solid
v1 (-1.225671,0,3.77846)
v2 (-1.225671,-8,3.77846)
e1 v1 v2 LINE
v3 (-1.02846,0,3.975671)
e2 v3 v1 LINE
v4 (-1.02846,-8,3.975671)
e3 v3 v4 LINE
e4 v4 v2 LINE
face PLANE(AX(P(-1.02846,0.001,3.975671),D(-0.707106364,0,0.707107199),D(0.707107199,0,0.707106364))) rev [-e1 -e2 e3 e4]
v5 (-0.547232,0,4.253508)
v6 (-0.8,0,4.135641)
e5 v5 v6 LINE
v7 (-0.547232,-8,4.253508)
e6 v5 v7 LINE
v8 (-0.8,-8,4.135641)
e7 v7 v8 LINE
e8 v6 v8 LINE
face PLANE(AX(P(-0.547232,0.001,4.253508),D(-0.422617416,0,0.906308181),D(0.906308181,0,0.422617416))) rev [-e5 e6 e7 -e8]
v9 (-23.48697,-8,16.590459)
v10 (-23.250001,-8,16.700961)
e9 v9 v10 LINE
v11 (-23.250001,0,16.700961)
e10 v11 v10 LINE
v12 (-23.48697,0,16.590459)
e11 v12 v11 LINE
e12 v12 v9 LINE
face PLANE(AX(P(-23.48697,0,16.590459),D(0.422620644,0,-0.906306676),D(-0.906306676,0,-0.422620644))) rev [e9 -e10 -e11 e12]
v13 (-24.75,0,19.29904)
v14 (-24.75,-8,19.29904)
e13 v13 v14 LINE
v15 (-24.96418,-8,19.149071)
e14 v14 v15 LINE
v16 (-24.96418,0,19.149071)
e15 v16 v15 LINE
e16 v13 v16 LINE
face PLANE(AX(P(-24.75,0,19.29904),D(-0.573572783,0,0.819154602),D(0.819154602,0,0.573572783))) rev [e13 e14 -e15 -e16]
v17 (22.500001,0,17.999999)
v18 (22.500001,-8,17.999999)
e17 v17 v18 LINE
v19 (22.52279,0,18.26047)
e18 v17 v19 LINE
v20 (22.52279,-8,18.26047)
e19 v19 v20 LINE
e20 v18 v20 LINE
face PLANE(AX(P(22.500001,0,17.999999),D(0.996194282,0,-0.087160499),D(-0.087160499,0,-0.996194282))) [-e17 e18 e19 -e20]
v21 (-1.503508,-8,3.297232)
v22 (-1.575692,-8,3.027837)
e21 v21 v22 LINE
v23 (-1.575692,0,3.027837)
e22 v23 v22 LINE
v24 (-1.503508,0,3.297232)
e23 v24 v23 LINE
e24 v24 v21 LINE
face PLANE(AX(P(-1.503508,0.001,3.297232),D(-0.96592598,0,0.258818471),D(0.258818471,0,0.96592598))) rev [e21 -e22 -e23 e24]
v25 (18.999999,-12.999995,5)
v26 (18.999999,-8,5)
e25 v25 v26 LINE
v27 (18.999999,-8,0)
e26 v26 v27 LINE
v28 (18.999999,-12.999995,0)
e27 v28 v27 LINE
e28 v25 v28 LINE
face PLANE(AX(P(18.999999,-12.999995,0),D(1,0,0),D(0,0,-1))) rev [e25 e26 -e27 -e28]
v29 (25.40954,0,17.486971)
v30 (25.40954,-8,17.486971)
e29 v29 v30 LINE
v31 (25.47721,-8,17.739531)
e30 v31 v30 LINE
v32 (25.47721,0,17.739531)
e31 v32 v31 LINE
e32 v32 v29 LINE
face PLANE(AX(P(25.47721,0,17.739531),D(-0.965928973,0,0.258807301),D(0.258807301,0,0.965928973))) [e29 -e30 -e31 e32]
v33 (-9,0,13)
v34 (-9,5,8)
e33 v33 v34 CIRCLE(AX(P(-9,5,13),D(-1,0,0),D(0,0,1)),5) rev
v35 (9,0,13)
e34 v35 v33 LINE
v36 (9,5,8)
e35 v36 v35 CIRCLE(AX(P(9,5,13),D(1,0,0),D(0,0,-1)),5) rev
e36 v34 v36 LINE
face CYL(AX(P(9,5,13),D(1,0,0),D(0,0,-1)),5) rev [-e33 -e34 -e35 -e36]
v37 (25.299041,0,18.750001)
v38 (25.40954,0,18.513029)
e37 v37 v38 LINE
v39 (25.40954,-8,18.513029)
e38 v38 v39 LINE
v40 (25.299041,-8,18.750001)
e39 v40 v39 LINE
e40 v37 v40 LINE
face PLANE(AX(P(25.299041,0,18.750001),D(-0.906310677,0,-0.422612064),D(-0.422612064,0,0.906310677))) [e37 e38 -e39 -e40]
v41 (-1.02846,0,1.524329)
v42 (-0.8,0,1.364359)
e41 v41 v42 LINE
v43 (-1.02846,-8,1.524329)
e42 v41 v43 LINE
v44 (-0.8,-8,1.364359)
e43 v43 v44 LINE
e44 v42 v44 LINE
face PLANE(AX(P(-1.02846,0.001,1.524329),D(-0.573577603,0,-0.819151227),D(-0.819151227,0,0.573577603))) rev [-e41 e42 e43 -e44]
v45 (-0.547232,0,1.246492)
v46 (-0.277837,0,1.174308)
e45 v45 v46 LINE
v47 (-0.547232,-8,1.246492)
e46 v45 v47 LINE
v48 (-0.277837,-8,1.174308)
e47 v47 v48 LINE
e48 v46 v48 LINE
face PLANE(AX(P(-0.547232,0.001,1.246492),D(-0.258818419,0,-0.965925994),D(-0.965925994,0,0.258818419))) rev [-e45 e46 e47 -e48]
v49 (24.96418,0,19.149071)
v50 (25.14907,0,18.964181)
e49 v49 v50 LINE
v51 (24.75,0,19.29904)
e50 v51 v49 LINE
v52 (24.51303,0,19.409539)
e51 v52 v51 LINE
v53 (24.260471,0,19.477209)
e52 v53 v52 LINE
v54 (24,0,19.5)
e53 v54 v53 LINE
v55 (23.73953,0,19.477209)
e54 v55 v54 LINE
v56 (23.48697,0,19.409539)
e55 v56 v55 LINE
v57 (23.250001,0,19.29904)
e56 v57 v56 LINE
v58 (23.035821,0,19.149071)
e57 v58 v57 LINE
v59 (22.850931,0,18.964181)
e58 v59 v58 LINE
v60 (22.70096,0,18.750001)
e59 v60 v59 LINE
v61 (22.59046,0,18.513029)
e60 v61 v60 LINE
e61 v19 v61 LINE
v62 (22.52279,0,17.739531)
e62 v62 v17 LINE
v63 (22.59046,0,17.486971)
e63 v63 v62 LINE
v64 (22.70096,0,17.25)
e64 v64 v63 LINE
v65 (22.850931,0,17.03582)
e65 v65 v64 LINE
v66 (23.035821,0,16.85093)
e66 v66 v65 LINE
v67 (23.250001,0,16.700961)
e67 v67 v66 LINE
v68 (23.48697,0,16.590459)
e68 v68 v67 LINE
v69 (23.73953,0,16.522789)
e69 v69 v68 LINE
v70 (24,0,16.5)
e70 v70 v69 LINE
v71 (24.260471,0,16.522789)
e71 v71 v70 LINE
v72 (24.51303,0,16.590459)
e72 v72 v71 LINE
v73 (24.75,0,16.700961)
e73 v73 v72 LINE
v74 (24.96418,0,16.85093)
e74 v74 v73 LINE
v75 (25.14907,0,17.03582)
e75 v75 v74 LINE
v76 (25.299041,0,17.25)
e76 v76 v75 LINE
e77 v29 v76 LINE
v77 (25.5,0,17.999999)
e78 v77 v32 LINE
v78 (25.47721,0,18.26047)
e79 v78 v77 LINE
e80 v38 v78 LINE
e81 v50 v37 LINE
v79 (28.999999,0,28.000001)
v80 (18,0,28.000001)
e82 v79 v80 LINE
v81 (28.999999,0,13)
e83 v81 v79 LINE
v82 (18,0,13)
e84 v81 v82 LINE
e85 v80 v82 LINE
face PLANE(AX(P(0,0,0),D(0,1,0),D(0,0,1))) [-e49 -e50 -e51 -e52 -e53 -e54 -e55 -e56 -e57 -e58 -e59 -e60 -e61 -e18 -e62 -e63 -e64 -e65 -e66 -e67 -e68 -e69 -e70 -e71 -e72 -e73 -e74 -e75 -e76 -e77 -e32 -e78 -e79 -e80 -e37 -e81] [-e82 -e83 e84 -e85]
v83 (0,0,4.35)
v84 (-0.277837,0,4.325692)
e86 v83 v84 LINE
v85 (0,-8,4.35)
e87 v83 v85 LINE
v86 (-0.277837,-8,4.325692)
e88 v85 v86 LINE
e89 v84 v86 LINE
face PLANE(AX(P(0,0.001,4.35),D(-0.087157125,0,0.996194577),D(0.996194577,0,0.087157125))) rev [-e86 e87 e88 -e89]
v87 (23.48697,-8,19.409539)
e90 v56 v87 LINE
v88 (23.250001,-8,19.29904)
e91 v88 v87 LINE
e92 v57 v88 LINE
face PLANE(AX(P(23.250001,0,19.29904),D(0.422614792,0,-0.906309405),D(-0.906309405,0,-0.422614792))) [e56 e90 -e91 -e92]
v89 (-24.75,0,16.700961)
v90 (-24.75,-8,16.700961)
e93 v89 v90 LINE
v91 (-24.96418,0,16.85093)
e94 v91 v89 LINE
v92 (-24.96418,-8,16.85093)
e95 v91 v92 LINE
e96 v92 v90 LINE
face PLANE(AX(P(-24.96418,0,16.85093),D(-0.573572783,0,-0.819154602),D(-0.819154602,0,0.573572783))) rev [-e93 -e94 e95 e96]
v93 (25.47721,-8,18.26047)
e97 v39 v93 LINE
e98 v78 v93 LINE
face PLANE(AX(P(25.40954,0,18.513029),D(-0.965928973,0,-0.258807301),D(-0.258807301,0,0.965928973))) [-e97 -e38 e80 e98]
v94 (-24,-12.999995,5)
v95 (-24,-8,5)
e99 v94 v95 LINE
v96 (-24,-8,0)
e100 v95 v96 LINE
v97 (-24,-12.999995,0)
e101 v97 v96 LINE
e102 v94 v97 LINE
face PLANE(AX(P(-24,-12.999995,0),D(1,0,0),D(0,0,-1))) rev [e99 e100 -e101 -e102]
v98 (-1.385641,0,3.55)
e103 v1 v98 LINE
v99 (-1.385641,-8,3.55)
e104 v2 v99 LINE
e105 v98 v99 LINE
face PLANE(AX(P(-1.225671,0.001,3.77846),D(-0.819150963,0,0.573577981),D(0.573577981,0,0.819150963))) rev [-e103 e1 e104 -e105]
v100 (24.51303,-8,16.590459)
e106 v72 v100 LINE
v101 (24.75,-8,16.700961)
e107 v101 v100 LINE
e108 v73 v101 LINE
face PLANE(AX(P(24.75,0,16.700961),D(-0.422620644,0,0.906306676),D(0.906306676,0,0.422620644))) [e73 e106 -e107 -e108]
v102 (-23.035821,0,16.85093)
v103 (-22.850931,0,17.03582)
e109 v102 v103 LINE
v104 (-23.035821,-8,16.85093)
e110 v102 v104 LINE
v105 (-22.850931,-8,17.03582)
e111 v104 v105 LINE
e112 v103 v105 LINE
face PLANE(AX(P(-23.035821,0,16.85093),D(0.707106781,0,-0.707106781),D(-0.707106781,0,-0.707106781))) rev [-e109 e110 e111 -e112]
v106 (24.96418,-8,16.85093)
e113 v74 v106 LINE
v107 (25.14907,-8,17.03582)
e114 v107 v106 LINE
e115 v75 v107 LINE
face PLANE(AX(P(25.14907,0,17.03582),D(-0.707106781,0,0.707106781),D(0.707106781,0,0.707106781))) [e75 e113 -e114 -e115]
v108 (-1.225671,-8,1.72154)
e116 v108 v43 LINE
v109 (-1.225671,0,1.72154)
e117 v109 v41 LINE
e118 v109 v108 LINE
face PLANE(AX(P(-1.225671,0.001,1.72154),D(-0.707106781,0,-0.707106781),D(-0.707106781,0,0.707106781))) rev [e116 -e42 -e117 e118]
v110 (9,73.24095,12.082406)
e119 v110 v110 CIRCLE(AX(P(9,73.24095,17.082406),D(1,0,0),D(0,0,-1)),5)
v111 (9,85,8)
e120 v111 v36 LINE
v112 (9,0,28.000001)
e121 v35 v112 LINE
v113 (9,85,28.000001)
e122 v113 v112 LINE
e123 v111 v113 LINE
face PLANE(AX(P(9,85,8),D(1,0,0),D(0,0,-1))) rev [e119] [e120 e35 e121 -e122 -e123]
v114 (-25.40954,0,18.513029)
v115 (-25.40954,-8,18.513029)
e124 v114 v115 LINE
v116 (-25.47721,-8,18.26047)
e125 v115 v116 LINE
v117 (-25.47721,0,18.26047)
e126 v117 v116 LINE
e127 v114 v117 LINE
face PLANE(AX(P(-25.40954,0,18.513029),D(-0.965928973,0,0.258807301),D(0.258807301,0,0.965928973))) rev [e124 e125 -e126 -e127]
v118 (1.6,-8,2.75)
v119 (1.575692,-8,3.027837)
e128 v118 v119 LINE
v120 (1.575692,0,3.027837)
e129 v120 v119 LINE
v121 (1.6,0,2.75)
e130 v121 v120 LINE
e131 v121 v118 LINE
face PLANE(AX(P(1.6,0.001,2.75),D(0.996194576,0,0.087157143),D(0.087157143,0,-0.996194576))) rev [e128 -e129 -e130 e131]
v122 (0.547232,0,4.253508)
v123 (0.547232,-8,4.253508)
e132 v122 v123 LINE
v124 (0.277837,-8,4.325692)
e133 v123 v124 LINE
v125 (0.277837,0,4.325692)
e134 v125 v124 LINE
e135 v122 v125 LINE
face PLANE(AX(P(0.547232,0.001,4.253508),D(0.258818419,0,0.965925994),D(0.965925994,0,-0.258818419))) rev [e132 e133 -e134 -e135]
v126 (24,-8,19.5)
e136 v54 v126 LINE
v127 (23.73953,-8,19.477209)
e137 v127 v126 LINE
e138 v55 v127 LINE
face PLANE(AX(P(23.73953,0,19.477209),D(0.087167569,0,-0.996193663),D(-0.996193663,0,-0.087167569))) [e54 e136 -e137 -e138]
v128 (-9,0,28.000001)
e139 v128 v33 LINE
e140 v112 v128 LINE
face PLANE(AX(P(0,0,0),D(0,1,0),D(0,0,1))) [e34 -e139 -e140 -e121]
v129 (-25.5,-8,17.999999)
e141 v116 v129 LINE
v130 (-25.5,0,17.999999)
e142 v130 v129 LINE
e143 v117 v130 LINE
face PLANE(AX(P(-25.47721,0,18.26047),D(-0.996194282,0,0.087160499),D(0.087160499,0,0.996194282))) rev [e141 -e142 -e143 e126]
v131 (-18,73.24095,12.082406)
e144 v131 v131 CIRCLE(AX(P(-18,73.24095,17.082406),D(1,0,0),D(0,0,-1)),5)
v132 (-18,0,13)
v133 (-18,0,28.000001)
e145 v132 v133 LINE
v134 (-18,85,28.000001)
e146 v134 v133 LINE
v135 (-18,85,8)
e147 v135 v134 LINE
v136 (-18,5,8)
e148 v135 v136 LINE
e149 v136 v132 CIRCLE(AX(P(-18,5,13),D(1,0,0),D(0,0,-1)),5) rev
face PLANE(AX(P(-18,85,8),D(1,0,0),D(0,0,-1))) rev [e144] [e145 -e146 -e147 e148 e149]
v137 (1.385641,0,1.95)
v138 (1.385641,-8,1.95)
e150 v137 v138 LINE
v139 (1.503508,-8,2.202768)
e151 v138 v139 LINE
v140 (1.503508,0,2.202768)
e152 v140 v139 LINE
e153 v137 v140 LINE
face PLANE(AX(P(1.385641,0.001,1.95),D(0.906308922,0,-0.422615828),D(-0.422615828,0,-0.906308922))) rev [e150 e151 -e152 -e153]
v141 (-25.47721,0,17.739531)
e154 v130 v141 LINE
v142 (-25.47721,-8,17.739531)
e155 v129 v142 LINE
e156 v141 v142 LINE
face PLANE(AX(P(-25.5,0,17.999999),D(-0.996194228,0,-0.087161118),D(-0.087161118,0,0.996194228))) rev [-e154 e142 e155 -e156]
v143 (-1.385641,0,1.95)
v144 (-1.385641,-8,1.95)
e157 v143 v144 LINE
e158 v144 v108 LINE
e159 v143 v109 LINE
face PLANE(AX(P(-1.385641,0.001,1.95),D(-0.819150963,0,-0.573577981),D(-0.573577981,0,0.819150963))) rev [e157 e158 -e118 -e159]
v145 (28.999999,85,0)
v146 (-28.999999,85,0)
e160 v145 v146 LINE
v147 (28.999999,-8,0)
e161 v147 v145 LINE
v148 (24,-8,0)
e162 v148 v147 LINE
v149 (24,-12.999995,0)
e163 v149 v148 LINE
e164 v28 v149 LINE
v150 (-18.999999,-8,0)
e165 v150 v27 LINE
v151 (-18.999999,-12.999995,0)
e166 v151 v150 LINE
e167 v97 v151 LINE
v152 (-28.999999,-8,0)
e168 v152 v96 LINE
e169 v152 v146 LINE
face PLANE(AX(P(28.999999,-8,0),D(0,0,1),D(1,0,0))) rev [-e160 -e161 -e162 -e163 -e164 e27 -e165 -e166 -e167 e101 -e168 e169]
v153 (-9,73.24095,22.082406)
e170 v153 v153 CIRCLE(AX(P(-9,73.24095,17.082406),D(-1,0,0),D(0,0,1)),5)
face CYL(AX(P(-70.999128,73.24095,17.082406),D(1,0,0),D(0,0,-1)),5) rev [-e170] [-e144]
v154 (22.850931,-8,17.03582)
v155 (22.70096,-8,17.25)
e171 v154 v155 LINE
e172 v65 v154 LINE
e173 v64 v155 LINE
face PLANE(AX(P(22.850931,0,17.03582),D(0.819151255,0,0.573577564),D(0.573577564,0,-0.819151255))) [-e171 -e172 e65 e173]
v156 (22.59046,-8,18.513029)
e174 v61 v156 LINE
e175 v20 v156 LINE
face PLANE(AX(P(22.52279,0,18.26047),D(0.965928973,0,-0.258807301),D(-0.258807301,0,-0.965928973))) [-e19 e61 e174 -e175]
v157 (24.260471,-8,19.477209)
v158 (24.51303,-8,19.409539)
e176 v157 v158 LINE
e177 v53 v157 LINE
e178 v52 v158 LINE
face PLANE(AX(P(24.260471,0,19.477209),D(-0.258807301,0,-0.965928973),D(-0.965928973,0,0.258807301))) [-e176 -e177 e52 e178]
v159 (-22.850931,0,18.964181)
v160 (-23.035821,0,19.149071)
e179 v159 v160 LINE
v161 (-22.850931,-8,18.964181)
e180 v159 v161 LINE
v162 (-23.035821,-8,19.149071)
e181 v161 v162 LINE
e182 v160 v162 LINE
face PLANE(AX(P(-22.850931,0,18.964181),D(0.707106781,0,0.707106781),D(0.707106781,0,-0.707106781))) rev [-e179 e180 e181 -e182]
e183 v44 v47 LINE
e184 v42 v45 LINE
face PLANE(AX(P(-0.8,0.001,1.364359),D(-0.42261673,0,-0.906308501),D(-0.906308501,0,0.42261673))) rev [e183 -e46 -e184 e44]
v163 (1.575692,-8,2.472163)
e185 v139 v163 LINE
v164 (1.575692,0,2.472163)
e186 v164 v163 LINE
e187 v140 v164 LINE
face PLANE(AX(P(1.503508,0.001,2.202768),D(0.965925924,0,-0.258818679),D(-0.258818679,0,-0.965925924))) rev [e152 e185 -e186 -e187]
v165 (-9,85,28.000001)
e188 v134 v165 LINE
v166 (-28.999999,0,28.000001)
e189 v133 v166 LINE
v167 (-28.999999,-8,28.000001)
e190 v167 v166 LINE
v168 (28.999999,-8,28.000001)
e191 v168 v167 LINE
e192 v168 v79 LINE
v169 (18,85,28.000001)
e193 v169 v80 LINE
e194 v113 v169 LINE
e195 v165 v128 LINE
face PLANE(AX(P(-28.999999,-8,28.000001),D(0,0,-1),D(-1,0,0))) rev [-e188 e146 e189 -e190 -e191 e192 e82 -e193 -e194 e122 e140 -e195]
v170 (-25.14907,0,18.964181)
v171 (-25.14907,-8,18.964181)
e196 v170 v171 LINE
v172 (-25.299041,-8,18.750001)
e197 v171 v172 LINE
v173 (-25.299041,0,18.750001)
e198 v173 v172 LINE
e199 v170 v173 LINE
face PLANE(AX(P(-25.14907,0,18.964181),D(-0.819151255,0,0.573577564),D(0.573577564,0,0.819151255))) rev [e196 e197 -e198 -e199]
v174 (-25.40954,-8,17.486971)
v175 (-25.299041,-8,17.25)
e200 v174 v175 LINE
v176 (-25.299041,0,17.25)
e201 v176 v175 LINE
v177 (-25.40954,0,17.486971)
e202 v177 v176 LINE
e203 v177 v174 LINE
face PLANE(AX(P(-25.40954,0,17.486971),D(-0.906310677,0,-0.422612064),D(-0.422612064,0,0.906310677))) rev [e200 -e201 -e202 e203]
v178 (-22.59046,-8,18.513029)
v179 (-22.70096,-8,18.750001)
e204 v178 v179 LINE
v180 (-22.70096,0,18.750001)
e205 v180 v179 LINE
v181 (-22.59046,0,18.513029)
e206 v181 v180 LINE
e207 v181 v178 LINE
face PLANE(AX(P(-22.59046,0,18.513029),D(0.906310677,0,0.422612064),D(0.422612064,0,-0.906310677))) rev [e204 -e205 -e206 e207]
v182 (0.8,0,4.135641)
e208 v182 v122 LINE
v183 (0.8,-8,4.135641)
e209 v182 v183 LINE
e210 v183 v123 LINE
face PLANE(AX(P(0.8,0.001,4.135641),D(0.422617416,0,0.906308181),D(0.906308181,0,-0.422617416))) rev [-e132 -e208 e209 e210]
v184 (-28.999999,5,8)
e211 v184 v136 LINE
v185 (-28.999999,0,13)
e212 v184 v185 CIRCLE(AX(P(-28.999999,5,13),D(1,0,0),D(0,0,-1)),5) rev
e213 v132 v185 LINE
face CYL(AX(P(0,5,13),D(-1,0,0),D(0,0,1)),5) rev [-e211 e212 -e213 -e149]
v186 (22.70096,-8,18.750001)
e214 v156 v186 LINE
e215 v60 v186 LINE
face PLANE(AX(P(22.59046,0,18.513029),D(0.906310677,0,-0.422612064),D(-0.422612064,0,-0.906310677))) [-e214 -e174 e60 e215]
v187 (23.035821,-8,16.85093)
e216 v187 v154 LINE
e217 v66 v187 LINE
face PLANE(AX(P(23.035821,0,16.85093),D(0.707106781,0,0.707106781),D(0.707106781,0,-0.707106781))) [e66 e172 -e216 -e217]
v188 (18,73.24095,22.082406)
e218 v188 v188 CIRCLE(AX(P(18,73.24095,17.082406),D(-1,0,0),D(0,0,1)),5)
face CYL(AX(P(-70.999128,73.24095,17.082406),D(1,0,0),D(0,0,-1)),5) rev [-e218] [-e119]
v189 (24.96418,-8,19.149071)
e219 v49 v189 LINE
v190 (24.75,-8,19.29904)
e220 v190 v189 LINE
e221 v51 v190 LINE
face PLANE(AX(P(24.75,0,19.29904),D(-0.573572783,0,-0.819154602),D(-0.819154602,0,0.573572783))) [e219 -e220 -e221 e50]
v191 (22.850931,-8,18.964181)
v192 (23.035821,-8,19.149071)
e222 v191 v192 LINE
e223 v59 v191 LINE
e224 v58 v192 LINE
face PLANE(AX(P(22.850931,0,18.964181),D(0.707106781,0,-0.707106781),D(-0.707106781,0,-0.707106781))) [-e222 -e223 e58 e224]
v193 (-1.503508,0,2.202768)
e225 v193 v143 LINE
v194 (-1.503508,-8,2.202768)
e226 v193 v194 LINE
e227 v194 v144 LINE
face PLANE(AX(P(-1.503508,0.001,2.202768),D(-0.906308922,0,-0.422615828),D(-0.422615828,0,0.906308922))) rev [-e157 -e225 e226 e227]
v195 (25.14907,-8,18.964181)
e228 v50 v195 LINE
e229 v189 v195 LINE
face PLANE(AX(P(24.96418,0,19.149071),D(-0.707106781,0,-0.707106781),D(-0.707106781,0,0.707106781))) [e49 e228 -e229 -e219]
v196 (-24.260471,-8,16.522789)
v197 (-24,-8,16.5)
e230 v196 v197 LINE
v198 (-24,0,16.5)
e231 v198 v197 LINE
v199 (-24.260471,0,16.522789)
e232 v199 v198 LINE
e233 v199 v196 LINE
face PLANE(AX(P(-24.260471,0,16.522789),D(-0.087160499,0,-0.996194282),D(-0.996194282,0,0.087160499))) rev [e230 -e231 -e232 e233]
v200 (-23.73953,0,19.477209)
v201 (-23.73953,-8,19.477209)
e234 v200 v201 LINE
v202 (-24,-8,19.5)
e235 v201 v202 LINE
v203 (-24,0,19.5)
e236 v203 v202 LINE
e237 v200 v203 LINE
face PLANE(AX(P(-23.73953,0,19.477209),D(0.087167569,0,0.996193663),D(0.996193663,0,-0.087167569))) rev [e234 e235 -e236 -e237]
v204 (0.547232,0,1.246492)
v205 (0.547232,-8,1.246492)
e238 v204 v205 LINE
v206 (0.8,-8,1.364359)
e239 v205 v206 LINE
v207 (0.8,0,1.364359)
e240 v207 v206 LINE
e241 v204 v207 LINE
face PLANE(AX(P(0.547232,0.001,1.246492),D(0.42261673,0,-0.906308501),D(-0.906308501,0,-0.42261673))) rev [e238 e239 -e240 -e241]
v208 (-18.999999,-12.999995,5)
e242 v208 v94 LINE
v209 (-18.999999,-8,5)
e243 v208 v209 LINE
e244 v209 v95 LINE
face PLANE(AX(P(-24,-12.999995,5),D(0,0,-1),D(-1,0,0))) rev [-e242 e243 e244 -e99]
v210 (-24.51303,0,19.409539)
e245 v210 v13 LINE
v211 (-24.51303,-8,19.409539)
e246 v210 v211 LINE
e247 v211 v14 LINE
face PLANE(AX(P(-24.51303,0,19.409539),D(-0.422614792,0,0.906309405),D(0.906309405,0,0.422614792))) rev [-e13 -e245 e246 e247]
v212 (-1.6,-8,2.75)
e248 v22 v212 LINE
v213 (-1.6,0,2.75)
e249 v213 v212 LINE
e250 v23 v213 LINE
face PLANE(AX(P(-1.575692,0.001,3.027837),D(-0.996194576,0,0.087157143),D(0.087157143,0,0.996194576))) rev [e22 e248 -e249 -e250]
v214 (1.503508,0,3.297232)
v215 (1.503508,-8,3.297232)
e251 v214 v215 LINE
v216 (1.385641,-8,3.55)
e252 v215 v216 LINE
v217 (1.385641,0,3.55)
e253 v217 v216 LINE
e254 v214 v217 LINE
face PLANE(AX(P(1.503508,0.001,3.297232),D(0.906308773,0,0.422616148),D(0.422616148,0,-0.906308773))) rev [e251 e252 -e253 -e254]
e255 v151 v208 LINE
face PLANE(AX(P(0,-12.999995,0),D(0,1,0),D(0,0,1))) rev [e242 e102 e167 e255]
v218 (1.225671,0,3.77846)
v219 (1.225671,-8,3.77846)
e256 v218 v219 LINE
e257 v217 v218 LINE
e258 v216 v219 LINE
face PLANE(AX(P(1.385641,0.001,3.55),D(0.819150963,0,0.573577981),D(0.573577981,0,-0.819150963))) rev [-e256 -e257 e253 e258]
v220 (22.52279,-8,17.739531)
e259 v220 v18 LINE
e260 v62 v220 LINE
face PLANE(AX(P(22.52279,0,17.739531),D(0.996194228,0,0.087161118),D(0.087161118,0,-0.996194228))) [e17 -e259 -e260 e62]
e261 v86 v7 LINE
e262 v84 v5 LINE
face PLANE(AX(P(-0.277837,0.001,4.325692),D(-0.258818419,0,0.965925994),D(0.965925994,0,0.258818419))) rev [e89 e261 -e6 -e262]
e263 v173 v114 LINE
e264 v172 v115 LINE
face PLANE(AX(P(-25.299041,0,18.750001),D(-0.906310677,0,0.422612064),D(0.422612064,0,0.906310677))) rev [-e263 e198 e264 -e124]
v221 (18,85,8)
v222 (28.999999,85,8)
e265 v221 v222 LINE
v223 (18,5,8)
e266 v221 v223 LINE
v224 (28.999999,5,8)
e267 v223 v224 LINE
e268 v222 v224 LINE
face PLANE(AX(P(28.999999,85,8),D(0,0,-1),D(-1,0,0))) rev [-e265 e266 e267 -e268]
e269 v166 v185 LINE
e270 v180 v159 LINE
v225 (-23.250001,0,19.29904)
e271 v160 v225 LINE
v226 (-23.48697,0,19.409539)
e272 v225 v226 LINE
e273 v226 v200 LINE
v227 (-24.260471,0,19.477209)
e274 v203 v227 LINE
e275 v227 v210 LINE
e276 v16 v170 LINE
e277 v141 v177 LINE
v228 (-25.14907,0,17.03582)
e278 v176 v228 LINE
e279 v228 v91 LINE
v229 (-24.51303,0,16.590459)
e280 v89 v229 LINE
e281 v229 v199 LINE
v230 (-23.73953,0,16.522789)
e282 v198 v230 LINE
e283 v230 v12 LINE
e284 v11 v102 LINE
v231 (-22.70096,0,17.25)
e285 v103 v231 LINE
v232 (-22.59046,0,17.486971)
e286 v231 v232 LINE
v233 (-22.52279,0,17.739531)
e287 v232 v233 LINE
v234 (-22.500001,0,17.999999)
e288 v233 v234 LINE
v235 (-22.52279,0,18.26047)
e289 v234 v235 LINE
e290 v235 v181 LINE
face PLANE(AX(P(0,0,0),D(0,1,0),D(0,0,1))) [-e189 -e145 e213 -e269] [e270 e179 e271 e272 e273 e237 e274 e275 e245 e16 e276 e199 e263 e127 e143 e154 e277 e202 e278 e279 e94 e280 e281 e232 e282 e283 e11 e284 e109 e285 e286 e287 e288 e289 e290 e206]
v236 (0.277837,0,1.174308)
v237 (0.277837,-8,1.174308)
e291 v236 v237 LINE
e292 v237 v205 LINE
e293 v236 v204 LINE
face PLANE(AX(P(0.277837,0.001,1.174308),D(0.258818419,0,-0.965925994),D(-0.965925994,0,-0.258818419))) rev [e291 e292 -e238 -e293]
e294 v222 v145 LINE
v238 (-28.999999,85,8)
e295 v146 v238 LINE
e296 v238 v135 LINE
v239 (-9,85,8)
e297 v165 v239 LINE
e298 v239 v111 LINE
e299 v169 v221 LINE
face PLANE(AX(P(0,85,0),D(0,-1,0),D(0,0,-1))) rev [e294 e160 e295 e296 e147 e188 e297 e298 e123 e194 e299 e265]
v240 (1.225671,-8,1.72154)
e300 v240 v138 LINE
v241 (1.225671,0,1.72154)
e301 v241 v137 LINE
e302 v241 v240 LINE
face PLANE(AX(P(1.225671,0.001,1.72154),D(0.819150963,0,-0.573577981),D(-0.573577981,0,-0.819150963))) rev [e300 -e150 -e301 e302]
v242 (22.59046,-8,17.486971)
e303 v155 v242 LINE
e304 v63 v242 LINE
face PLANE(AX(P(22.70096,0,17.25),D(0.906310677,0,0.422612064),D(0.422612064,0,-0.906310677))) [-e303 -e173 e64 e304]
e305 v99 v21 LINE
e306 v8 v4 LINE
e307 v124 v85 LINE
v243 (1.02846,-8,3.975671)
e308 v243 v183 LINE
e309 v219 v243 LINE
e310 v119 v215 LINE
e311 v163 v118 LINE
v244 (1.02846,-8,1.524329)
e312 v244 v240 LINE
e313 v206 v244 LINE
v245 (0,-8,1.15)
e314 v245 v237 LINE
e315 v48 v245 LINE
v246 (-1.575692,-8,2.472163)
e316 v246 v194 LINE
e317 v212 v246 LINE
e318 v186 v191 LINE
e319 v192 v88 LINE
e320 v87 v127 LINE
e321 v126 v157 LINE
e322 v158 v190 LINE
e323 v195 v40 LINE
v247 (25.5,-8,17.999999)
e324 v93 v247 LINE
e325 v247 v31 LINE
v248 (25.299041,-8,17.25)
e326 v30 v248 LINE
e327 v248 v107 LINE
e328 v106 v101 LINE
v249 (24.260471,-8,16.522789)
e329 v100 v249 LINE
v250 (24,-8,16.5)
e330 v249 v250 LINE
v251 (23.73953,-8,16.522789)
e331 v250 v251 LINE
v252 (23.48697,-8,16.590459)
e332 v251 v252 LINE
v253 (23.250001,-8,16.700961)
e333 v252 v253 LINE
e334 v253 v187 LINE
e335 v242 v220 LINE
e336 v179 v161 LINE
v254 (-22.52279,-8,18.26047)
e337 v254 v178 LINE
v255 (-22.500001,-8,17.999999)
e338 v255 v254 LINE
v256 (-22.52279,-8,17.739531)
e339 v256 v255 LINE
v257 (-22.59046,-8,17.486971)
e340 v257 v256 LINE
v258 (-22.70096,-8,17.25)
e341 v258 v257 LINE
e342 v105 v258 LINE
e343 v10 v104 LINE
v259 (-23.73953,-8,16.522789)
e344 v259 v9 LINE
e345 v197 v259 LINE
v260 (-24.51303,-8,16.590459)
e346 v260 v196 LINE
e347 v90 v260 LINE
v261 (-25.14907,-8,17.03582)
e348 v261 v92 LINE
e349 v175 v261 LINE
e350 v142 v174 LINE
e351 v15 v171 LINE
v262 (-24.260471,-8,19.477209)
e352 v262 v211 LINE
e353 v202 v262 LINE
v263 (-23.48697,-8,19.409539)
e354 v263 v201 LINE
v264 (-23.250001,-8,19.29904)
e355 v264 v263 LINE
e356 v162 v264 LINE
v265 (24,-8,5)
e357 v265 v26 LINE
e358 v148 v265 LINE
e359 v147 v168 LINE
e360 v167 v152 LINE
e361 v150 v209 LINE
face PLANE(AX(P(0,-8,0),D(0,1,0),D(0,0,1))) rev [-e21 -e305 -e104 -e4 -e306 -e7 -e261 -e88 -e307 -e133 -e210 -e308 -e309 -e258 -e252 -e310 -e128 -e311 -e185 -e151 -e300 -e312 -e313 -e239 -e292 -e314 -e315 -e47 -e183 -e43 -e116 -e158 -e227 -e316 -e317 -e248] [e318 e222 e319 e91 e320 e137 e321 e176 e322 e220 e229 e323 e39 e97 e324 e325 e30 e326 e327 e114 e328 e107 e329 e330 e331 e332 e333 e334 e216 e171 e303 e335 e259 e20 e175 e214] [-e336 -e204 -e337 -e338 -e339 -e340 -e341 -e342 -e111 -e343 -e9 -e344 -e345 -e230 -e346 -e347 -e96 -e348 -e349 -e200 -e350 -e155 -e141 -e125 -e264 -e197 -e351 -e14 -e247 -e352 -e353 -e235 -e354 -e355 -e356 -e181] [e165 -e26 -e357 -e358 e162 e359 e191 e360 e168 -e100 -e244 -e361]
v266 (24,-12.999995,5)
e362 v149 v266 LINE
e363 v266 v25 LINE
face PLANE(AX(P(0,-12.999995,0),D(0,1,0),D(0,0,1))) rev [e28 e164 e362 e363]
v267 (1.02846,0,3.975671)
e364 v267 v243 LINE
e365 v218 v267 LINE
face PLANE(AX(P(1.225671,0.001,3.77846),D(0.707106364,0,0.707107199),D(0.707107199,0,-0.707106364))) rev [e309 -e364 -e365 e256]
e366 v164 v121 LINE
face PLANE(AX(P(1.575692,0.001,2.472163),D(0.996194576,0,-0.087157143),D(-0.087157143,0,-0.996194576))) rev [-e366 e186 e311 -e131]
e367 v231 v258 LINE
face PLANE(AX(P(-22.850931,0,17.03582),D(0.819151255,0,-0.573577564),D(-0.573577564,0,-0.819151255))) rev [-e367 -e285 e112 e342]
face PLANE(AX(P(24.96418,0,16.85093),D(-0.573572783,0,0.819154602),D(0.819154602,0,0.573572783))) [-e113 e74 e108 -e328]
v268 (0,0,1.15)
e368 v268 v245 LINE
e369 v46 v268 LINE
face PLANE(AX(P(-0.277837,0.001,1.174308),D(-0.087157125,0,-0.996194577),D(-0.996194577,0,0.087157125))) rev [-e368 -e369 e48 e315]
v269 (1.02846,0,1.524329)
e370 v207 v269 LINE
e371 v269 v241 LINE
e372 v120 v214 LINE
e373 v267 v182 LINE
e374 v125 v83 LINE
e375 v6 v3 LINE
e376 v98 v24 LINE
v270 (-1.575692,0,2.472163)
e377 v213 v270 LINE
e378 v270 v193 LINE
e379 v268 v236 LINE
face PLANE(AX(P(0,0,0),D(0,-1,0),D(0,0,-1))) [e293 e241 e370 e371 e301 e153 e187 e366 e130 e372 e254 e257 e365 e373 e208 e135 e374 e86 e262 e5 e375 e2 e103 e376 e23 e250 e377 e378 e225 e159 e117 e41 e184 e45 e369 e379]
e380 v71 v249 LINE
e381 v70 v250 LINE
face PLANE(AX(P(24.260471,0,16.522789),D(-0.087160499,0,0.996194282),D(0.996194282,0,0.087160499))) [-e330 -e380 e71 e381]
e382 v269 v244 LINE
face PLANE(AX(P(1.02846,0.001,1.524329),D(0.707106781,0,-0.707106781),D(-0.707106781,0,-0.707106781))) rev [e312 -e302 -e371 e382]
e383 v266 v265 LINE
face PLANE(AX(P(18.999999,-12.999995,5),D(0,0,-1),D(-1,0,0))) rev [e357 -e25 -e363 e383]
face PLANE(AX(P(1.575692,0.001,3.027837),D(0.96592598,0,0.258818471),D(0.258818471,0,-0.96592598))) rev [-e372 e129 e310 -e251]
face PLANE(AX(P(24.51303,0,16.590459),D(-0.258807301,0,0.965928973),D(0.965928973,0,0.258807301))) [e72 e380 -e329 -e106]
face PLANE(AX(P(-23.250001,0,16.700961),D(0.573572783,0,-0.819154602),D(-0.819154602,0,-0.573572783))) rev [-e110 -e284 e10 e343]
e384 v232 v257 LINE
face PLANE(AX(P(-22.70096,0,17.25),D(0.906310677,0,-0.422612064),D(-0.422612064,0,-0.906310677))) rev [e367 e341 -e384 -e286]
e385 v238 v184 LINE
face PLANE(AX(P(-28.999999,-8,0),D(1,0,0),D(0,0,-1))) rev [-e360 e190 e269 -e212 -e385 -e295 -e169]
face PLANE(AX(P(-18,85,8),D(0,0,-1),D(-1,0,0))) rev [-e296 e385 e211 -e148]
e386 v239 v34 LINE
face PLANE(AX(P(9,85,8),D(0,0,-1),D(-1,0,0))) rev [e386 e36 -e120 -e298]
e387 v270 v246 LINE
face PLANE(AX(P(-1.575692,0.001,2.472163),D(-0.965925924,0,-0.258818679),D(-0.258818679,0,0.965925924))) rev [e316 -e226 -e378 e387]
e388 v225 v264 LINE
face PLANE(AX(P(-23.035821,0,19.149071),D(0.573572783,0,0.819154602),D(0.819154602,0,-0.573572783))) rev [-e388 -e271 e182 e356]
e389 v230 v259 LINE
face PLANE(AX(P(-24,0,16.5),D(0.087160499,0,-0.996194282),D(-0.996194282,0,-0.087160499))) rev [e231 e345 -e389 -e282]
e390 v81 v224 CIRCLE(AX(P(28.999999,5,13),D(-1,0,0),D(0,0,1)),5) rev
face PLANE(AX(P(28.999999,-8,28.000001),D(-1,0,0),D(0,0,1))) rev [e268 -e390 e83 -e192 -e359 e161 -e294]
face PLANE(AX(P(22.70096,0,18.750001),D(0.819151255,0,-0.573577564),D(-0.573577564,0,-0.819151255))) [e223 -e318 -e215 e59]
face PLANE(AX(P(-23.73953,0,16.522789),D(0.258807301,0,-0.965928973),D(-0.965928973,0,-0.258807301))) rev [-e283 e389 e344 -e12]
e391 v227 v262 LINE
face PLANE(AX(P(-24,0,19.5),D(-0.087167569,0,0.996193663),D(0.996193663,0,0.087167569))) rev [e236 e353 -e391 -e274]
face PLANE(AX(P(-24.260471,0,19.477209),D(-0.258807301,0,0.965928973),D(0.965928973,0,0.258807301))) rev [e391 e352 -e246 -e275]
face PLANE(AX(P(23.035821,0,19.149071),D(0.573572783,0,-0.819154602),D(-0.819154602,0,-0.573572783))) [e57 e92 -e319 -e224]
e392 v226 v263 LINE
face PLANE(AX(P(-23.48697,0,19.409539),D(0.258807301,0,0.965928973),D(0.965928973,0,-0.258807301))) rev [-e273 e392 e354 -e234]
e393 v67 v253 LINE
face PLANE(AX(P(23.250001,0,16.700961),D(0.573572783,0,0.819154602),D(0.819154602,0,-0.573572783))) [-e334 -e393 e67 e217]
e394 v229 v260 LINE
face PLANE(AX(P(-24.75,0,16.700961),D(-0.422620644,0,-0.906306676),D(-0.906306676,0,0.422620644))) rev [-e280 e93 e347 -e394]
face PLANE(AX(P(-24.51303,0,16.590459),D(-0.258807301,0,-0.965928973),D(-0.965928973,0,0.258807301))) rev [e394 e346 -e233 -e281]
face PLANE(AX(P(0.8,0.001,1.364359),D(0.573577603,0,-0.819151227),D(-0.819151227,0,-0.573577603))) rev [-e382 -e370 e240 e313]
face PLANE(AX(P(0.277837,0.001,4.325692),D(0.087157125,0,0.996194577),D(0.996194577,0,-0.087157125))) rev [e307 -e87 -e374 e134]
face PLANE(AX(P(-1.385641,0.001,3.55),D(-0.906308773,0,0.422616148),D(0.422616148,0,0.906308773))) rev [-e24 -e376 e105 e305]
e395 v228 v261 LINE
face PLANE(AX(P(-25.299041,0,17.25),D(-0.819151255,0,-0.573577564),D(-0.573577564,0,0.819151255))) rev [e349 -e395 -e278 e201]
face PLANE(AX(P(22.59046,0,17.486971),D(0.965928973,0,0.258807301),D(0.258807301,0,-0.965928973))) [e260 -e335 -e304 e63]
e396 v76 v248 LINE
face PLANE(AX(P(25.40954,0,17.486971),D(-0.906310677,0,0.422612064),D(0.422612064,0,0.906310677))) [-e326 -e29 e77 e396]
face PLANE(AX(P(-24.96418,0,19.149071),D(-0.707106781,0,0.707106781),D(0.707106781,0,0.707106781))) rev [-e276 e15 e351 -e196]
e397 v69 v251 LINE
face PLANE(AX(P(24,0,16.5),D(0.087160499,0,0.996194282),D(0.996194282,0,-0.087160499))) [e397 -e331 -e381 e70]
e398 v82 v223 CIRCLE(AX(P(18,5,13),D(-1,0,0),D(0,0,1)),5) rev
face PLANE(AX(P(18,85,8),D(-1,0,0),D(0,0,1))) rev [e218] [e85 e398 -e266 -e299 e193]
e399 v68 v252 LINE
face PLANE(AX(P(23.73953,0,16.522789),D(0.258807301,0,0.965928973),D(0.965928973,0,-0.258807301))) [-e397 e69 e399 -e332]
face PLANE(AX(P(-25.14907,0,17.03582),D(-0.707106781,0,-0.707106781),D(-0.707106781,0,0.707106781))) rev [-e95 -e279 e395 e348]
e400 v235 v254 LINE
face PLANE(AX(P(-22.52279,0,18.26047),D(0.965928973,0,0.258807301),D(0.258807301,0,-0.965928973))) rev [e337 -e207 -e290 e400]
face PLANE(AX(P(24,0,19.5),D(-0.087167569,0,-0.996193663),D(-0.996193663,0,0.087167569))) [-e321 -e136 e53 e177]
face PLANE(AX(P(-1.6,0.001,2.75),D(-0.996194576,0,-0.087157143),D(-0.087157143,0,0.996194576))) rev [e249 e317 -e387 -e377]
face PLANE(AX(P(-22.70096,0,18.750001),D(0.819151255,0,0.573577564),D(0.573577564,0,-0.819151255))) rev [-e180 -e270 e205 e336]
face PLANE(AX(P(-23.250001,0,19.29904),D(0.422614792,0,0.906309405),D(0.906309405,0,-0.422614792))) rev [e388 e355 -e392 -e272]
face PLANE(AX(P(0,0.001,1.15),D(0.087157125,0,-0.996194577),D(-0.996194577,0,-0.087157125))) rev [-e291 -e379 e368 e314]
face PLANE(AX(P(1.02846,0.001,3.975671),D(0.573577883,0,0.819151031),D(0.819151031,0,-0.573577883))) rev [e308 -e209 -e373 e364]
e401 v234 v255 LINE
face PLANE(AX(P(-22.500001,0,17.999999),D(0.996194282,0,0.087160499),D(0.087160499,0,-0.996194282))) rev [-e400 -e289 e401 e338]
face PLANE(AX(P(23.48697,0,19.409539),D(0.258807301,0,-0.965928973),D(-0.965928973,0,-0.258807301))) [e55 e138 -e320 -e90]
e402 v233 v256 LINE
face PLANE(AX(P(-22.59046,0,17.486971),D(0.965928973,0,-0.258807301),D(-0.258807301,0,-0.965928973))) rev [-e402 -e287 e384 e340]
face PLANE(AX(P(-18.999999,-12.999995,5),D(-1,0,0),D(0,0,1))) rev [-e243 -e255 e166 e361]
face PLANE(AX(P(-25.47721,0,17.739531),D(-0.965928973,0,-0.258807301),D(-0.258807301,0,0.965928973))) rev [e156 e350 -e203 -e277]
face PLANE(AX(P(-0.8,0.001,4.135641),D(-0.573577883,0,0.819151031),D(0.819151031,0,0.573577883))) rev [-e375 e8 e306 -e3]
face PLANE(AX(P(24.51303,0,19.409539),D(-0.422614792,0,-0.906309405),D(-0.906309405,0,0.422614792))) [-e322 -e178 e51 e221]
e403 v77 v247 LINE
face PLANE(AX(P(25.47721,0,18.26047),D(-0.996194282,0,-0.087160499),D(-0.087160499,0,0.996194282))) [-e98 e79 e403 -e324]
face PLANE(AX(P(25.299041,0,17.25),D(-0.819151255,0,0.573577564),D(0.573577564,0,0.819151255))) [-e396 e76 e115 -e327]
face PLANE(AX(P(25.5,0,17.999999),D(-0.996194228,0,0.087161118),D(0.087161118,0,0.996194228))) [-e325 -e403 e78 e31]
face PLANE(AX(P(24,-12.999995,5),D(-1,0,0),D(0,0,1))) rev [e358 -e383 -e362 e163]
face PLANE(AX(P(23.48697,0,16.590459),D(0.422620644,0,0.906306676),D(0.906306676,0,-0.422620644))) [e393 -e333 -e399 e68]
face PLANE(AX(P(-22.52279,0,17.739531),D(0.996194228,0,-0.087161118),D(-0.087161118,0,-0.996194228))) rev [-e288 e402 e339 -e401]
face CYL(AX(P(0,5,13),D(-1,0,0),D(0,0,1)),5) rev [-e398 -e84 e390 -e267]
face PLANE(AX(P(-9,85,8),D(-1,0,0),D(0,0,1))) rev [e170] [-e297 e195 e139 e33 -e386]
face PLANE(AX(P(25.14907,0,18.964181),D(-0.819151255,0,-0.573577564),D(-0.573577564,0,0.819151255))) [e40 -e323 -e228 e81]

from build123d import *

# Parameters (mm, degrees)
SKETCH1_W           = 57.999998332
SKETCH1_H           = 28.000000864
BOSS_EXTRUDE1_DEPTH = 8
CUT_EXTRUDE2_REACH  = 43.097
CUT_EXTRUDE3_DEPTH  = 42.097445176
CUT_EXTRUDE4_DEPTH  = 42.097445176
SKETCH8_W           = 5.00000082
SKETCH8_H           = 4.999999888
BOSS_EXTRUDE2_DEPTH = 4.999995232
SKETCH9_W           = 5.00000082
SKETCH9_H           = 4.999999888
BOSS_EXTRUDE3_DEPTH = 4.999995232
BOSS_EXTRUDE4_DEPTH = 85
FILLET1_R           = 5
FILLET2_R           = 5
FILLET3_R           = 5
HOLE1_START         = -18
HOLE1_OUTLINE_R     = 5
HOLE1_DEPTH         = 36


# Read off the part's stored shape, not the designer's step: Hole1
with BuildPart() as part:
    # Sketch1 → Boss-Extrude1 (new body)
    with BuildSketch(Plane.XZ):
        with Locations((0, 14.000000432)):
            Rectangle(SKETCH1_W, SKETCH1_H)
    extrude(amount=BOSS_EXTRUDE1_DEPTH)

    # Sketch3 → Cut-Extrude2 (cut, up to next)
    with BuildSketch(Plane.XZ.offset(8), mode=Mode.PRIVATE) as cut_extrude2_sk1:
        Polygon((0, 4.350000061), (-0.277837098, 4.325692076), (-0.547232223, 4.253508057), (-0.79999998, 4.135640804), (-1.028459985, 3.975670785), (-1.225671032, 3.77845997), (-1.385641051, 3.550000023), (-1.503507956, 3.297232091), (-1.575691975, 3.027837025), (-1.59999996, 2.749999985), (-1.575691975, 2.472162945), (-1.503507956, 2.202768112), (-1.385641051, 1.949999947), (-1.225671032, 1.72154), (-1.028459985, 1.524328953), (-0.79999998, 1.36435905), (-0.547232223, 1.246492029), (-0.277837098, 1.17430801), (0, 1.150000026), (0.277837098, 1.17430801), (0.547232223, 1.246492029), (0.79999998, 1.36435905), (1.028459985, 1.524328953), (1.225671032, 1.72154), (1.385641051, 1.949999947), (1.503507956, 2.202768112), (1.575691975, 2.472162945), (1.59999996, 2.749999985), (1.575691975, 3.027837025), (1.503507956, 3.297232091), (1.385641051, 3.550000023), (1.225671032, 3.77845997), (1.028459985, 3.975670785), (0.79999998, 4.135640804), (0.547232223, 4.253508057), (0.277837098, 4.325692076), align=None)
    cut_extrude2_tool1 = extrude(cut_extrude2_sk1.sketch, amount=-CUT_EXTRUDE2_REACH, mode=Mode.PRIVATE) & part.part
    add(cut_extrude2_tool1.solids().sort_by_distance((0, -8, 2.75))[0], mode=Mode.SUBTRACT)

    # Sketch4 → Cut-Extrude3 (cut, through all)
    with BuildSketch(Plane.XZ.offset(8)):
        Polygon((-23.035820574, 16.850929707), (-22.850930691, 17.03581959), (-22.700959817, 17.249999568), (-22.590460256, 17.486970872), (-22.522790357, 17.739530653), (-22.500000894, 17.999999225), (-22.522790357, 18.26046966), (-22.590460256, 18.513029441), (-22.700959817, 18.750000745), (-22.850930691, 18.964180723), (-23.035820574, 19.149070606), (-23.250000551, 19.299039617), (-23.486969993, 19.409539178), (-23.739529774, 19.477209076), (-24.000000209, 19.500000402), (-24.260470644, 19.477209076), (-24.513030425, 19.409539178), (-24.749999866, 19.299039617), (-24.964179844, 19.149070606), (-25.149069726, 18.964180723), (-25.299040601, 18.750000745), (-25.409540161, 18.513029441), (-25.47721006, 18.26046966), (-25.499999523, 17.999999225), (-25.47721006, 17.739530653), (-25.409540161, 17.486970872), (-25.299040601, 17.249999568), (-25.149069726, 17.03581959), (-24.964179844, 16.850929707), (-24.749999866, 16.700960696), (-24.513030425, 16.590459272), (-24.260470644, 16.522789374), (-24.000000209, 16.499999911), (-23.739529774, 16.522789374), (-23.486969993, 16.590459272), (-23.250000551, 16.700960696), align=None)
    extrude(amount=-CUT_EXTRUDE3_DEPTH, mode=Mode.SUBTRACT)

    # Sketch5 → Cut-Extrude4 (cut, through all)
    with BuildSketch(Plane(origin=(0, -8, 0), x_dir=(-1, 0, 0), z_dir=(0, 1, 0))):
        Polygon((-23.486969993, 16.590459272), (-23.250000551, 16.700960696), (-23.035820574, 16.850929707), (-22.850930691, 17.03581959), (-22.700959817, 17.249999568), (-22.590460256, 17.486970872), (-22.522790357, 17.739530653), (-22.500000894, 17.999999225), (-22.522790357, 18.26046966), (-22.590460256, 18.513029441), (-22.700959817, 18.750000745), (-22.850930691, 18.964180723), (-23.035820574, 19.149070606), (-23.250000551, 19.299039617), (-23.486969993, 19.409539178), (-23.739529774, 19.477209076), (-24.000000209, 19.500000402), (-24.260470644, 19.477209076), (-24.513030425, 19.409539178), (-24.749999866, 19.299039617), (-24.964179844, 19.149070606), (-25.149069726, 18.964180723), (-25.299040601, 18.750000745), (-25.409540161, 18.513029441), (-25.47721006, 18.26046966), (-25.499999523, 17.999999225), (-25.47721006, 17.739530653), (-25.409540161, 17.486970872), (-25.299040601, 17.249999568), (-25.149069726, 17.03581959), (-24.964179844, 16.850929707), (-24.749999866, 16.700960696), (-24.513030425, 16.590459272), (-24.260470644, 16.522789374), (-24.000000209, 16.499999911), (-23.739529774, 16.522789374), align=None)
    extrude(amount=CUT_EXTRUDE4_DEPTH, mode=Mode.SUBTRACT)

    # Sketch8 → Boss-Extrude2 (add)
    with BuildSketch(Plane.XZ.offset(8)):
        with Locations((-21.499999799, 2.499999944)):
            Rectangle(SKETCH8_W, SKETCH8_H)
    extrude(amount=BOSS_EXTRUDE2_DEPTH)

    # Sketch9 → Boss-Extrude3 (add)
    with BuildSketch(Plane.XZ.offset(8)):
        with Locations((21.499999799, 2.499999944)):
            Rectangle(SKETCH9_W, SKETCH9_H)
    extrude(amount=BOSS_EXTRUDE3_DEPTH)

    # Sketch10 → Boss-Extrude4 (add)
    with BuildSketch(Plane(origin=(0, 0, 0), x_dir=(1, 0, 0), z_dir=(0, 1, 0))):
        Polygon((9, -8), (-9, -8), (-9, -28.000000864), (-18, -28.000000864), (-18, -8), (-28.999999166, -8), (-28.999999166, 0), (28.999999166, 0), (28.999999166, -8), (18, -8), (18, -28.000000864), (9, -28.000000864), align=None)
    extrude(amount=BOSS_EXTRUDE4_DEPTH)

    # Fillet1
    fillet1_edges = [part.edges().sort_by_distance(p)[0] for p in [
        (0, 0, 8),
    ]]
    fillet(fillet1_edges, radius=FILLET1_R)

    # Fillet2
    fillet2_edges = [part.edges().sort_by_distance(p)[0] for p in [
        (23.499999583, 0, 8),
    ]]
    fillet(fillet2_edges, radius=FILLET2_R)

    # Fillet3
    fillet3_edges = [part.edges().sort_by_distance(p)[0] for p in [
        (-23.499999583, 0, 8),
    ]]
    fillet(fillet3_edges, radius=FILLET3_R)

    # Hole1 outline → Hole1 (cut)
    with BuildSketch(Plane.YZ.offset(HOLE1_START)):
        with Locations((73.240950457, 17.082405748)):
            Circle(HOLE1_OUTLINE_R)
    extrude(amount=HOLE1_DEPTH, mode=Mode.SUBTRACT)


solid = part.part
